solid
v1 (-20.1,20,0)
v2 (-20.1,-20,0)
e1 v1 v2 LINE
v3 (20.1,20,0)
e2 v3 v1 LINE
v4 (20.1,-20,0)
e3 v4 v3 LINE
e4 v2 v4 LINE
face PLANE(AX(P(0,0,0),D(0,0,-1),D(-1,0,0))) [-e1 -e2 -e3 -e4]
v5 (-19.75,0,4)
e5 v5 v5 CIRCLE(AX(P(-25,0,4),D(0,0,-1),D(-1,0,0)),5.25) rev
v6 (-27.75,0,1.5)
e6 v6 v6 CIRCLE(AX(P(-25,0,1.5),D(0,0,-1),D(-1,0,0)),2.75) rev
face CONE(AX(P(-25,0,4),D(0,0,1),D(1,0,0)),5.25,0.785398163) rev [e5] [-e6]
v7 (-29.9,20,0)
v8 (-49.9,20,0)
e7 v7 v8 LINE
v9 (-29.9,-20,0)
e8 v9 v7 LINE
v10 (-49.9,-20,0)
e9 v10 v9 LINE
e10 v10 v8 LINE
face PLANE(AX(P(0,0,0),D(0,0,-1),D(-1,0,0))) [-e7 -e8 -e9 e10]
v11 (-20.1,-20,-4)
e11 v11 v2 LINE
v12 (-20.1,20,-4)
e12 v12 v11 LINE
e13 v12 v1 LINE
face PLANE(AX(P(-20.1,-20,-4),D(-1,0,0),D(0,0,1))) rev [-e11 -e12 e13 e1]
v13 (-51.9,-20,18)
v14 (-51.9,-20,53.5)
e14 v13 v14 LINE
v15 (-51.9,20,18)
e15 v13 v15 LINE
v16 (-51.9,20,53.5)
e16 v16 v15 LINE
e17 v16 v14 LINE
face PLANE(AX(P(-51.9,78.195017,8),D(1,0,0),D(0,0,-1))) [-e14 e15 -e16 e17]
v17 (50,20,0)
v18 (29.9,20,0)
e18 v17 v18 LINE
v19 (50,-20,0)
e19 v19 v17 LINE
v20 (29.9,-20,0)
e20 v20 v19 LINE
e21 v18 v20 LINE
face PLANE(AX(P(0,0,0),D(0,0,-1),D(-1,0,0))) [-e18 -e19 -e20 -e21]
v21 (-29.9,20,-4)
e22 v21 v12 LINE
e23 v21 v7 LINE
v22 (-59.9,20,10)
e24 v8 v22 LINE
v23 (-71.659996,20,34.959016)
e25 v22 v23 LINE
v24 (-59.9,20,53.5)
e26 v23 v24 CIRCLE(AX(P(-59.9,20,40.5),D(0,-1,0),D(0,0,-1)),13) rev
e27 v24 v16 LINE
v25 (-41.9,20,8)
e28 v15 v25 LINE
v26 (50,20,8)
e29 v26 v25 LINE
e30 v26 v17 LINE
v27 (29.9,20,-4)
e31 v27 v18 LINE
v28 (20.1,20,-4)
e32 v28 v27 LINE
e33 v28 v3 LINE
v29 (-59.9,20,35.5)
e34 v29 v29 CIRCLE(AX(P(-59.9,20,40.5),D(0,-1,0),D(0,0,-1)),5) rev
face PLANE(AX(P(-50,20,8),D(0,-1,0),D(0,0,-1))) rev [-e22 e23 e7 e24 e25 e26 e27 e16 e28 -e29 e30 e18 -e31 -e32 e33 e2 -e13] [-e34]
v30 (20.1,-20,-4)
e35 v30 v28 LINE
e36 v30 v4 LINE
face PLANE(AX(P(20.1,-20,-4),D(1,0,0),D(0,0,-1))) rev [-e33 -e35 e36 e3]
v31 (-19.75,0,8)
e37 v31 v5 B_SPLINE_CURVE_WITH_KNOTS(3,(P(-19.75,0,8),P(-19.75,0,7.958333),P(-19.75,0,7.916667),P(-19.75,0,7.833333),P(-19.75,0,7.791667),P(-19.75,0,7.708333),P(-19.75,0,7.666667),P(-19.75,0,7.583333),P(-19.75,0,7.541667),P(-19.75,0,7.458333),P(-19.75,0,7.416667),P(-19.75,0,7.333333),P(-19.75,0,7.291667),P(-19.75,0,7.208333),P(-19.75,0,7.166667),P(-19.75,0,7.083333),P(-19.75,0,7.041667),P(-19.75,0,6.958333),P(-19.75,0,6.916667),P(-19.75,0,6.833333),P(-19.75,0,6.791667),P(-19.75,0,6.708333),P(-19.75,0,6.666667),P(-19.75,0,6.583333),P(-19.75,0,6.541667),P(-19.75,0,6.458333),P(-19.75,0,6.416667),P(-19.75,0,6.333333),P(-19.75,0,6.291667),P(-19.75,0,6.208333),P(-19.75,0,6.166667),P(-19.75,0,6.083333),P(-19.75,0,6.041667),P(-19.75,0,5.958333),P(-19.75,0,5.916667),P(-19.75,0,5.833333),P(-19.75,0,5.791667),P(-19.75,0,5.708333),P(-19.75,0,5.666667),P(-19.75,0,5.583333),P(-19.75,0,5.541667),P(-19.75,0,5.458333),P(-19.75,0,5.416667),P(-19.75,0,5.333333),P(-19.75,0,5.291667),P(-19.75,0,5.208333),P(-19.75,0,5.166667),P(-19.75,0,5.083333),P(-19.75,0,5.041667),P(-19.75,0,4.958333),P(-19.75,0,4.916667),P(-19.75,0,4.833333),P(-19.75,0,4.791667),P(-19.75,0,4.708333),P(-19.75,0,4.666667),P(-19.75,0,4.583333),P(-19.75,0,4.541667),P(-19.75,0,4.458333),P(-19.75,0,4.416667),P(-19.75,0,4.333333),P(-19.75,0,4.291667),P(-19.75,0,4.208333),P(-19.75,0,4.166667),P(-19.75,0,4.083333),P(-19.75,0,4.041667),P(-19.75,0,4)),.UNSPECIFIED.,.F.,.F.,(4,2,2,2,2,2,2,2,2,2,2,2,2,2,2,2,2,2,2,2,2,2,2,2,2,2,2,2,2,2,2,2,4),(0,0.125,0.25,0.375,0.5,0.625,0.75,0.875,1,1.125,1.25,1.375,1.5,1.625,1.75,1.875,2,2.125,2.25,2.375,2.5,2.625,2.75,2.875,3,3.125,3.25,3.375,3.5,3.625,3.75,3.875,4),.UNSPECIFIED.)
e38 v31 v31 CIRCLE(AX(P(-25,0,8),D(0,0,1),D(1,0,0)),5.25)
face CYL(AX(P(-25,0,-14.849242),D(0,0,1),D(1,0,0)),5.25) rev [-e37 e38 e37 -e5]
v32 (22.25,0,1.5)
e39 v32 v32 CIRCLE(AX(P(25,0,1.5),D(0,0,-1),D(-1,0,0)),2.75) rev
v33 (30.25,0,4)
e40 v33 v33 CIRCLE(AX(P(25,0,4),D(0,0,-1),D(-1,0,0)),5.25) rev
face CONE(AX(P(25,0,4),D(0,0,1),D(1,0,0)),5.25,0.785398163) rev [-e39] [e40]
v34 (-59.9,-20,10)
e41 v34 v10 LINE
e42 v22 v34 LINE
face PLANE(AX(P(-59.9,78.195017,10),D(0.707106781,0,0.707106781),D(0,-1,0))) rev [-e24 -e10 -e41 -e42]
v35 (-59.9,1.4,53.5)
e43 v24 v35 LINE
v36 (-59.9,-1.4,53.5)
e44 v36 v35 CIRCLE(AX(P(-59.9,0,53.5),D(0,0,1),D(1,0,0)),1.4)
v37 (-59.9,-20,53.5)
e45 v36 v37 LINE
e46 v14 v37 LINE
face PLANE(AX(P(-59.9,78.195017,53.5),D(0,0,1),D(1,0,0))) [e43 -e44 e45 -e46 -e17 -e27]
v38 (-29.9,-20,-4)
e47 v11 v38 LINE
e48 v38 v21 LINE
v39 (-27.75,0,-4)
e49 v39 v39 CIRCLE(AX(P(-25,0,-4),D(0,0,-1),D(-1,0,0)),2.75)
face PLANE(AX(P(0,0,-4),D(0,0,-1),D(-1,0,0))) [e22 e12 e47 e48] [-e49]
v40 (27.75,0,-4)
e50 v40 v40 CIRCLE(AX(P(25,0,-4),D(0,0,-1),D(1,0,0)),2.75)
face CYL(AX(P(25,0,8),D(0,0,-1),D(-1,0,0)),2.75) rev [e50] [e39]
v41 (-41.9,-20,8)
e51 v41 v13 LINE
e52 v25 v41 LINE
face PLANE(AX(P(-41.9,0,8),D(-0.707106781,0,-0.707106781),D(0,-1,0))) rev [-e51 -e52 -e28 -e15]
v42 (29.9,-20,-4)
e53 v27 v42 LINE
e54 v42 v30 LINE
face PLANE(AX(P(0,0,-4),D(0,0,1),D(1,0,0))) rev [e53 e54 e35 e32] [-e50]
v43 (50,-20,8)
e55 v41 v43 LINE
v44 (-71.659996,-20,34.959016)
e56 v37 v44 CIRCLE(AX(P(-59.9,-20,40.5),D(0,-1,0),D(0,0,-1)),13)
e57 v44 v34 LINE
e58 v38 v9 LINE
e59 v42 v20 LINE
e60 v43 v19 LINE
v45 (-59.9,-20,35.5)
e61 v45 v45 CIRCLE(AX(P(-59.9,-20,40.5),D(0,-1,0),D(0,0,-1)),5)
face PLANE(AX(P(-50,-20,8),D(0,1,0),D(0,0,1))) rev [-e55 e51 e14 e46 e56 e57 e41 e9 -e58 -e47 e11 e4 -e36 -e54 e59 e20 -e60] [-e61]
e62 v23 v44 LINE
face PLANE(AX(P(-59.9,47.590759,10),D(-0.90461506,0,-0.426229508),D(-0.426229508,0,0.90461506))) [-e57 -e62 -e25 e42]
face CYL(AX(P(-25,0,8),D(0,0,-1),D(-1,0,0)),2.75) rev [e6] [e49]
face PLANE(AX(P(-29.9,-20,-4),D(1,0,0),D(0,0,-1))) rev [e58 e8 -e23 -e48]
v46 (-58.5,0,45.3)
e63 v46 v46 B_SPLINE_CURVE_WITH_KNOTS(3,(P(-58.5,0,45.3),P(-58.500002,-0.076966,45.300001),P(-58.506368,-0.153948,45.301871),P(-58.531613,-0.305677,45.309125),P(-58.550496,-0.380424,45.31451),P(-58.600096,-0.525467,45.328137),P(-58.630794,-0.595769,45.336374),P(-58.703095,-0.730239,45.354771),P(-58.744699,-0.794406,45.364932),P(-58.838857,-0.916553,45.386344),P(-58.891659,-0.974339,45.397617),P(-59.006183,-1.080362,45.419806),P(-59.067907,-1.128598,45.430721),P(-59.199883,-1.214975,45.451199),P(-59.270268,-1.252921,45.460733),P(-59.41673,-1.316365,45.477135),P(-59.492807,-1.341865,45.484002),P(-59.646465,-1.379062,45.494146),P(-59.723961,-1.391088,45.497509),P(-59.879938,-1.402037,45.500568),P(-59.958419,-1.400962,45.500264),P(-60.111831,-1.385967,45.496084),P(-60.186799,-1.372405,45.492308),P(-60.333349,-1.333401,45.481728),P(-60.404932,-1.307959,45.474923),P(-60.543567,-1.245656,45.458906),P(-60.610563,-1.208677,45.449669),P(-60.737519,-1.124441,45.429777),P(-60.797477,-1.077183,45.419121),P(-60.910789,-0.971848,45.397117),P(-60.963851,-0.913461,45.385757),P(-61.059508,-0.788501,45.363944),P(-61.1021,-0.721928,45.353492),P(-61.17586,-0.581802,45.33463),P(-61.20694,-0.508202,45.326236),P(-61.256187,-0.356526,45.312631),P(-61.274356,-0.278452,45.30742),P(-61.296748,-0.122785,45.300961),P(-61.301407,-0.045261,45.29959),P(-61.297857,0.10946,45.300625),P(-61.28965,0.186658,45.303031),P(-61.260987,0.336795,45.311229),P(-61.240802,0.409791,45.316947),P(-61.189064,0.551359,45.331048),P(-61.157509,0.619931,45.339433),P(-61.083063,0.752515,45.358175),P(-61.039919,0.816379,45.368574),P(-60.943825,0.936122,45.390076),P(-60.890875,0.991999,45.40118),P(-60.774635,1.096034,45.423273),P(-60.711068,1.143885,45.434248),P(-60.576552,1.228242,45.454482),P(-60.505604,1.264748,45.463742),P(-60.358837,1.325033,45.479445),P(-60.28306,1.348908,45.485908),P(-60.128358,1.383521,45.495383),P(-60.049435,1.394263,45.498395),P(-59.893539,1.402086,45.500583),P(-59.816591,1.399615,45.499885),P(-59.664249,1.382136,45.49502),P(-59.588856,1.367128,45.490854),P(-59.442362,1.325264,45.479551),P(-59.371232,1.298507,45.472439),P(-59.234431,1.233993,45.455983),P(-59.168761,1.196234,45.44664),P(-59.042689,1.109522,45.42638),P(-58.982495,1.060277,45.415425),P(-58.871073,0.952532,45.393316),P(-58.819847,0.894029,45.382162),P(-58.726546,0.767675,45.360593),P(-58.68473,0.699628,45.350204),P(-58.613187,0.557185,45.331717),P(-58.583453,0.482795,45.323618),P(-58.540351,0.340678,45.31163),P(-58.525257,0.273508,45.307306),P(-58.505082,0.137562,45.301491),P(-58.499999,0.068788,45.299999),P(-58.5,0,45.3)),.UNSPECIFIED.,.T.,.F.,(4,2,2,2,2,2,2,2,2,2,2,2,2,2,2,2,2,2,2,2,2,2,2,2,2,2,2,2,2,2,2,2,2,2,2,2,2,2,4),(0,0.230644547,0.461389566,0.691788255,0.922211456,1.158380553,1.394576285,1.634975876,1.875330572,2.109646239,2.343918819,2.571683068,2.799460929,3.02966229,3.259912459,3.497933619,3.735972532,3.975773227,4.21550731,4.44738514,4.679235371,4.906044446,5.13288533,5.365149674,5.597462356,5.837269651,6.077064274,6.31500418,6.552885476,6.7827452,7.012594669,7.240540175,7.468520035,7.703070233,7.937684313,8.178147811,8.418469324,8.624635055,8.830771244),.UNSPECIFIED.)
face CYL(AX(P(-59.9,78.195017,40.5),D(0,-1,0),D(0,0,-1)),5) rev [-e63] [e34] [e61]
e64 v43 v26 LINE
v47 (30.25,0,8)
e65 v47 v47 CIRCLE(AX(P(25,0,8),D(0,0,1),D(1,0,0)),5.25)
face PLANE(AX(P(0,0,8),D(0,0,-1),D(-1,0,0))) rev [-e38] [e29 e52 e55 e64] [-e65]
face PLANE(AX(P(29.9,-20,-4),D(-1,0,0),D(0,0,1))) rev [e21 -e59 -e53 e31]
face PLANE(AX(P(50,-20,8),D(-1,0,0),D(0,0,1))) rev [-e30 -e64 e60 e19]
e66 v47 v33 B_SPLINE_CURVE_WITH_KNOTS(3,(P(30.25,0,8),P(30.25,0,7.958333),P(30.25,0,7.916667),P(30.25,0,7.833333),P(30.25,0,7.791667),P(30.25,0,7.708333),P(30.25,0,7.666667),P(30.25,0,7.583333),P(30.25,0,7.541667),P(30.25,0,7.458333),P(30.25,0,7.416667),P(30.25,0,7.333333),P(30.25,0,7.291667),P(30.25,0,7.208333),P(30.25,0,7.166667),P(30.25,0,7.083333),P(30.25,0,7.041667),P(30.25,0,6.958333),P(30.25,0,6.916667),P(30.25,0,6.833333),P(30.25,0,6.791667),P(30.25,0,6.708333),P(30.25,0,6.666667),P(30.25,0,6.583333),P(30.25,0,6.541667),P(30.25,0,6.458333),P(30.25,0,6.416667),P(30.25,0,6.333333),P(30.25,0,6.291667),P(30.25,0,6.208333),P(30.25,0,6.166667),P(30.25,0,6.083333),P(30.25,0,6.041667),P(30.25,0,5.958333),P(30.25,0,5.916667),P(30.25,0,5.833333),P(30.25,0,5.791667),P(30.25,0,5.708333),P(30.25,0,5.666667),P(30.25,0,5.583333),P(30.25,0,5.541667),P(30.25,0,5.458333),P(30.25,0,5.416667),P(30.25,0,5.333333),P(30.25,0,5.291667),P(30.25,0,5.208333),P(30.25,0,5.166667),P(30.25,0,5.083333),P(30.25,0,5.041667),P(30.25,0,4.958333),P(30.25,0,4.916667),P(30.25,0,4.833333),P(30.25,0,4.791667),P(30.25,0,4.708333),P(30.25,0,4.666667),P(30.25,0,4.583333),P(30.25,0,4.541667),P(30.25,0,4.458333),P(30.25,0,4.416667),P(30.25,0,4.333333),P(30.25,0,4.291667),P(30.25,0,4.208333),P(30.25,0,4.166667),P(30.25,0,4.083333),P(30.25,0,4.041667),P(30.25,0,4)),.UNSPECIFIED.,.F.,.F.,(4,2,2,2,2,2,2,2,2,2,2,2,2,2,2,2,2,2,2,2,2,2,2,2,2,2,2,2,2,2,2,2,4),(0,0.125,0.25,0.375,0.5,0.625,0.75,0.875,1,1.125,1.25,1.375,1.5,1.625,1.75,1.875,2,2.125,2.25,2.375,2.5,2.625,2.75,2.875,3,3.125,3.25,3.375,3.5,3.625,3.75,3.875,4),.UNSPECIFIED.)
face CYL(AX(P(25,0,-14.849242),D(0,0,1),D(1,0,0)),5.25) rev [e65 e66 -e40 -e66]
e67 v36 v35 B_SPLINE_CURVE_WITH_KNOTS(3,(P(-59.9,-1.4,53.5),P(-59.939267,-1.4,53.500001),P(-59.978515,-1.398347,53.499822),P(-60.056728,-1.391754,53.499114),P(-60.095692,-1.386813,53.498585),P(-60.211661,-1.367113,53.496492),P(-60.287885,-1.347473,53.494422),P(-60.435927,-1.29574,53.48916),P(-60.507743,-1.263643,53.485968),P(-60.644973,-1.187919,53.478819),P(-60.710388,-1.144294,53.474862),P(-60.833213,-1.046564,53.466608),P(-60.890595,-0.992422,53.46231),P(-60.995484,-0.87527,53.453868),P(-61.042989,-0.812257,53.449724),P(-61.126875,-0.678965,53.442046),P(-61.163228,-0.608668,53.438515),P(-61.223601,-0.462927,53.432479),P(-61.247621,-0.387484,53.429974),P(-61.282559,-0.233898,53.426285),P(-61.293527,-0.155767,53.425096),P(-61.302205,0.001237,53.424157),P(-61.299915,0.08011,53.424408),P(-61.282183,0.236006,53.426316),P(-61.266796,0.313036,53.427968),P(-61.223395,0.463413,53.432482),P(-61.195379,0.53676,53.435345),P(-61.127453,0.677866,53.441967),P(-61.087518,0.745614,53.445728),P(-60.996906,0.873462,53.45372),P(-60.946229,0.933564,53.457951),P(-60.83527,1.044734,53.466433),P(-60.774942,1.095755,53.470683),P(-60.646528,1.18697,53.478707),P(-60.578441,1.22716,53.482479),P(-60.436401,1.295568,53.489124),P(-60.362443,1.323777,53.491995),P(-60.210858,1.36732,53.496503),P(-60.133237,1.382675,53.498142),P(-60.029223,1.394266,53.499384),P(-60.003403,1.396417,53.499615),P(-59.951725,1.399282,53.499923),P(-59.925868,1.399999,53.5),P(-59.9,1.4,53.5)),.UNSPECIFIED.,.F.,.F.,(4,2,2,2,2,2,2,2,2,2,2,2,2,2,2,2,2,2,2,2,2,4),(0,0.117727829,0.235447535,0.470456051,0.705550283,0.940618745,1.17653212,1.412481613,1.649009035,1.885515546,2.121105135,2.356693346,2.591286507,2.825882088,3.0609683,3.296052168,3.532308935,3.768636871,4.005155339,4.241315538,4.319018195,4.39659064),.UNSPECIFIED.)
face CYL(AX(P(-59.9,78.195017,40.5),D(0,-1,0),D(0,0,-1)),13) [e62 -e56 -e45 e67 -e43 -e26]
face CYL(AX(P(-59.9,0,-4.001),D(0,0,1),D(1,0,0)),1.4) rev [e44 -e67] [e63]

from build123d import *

# Parameters (mm, degrees)
SKETCH1_W               = 100
SKETCH1_H               = 40
SKETCH1_R               = 2.75
BOSS_EXTRUDE1_DEPTH     = 8
SKETCH2_R               = 5
BOSS_EXTRUDE2_DEPTH     = 40
BOSS_EXTRUDE3_START     = 4
SKETCH4_W               = 9.8
SKETCH4_H               = 40
SKETCH4_R               = 2.75
BOSS_EXTRUDE3_DEPTH     = 4
SKETCH5_R               = 5.25
CUT_EXTRUDE1_DEPTH      = 4
CHAMFER2_SIZE           = 2.5
CUT_EXTRUDE2_REACH      = 96.977
CUT_EXTRUDE2_END_RADIUS = 5
SKETCH6_R               = 1.4
BOSS_EXTRUDE4_DEPTH     = 40


# Some blends are built 0.0001 mm under size
with BuildPart() as part:
    # Sketch1 → Boss-Extrude1 (new body)
    with BuildSketch(Plane.XY):
        Rectangle(SKETCH1_W, SKETCH1_H)
        with Locations((-25, 0)):
            Circle(SKETCH1_R, mode=Mode.SUBTRACT)
        with Locations((25, 0)):
            Circle(SKETCH1_R, mode=Mode.SUBTRACT)
    extrude(amount=BOSS_EXTRUDE1_DEPTH)

    # Sketch2 → Boss-Extrude2 (add)
    with BuildSketch(Plane.XZ.offset(20)):
        with BuildLine():
            Line((-50, 0), (-59.9, 0))
            Line((-59.9, 0), (-59.9, 27.5))
            ThreePointArc((-59.9, 27.5), (-72.9, 40.5), (-59.9, 53.5))
            Line((-59.9, 53.5), (-51.9, 53.5))
            Line((-51.9, 53.5), (-51.9, 8))
            Line((-51.9, 8), (-50, 8))
            Line((-50, 8), (-50, 0))
        make_face()
        with Locations(Location((-59.9, 40.5, 0), (0, 0, 270))):
            Circle(SKETCH2_R, mode=Mode.SUBTRACT)
    extrude(amount=-BOSS_EXTRUDE2_DEPTH)

    # Chamfer1
    # the kernel refuses this chamfer: 10 mm, written as the material it adds along each edge
    with BuildSketch(Plane(origin=(-51.9, -20, 8), x_dir=(0.9996219169112968, 0, -0.027495876610586403), z_dir=(0, 1, 0))) as chamfer1_piece_1:
        with BuildLine():
            Line((10.286731952, 0), (-0.565471549, -10.271177935))
            Line((-0.565471549, -10.271177935), (-0.765395932, -10.26567876))
            ThreePointArc((-0.765395932, -10.26567876), (-0.341292271, -5.133978296), (-0.199924383, 0.005499175))
            Line((-0.199924383, 0.005499175), (0.005499175, 0.199924383))
            ThreePointArc((0.005499175, 0.199924383), (5.144976647, 0.058556496), (10.292231127, 0.199924383))
            Line((10.292231127, 0.199924383), (10.286731952, 0))
        make_face()
    extrude(amount=40)
    with BuildSketch(Plane(origin=(-59.9, -20, 27.5), x_dir=(-0.9634026382887829, 0, 0.26805849462050707), z_dir=(0, 1, 0))) as chamfer1_piece_2:
        with BuildLine():
            Line((6.087608123, 0), (-2.363030305, -7.699460597))
            Line((-2.363030305, -7.699460597), (-2.555710833, -7.645848898))
            ThreePointArc((-2.555710833, -7.645848898), (-1.271764875, -3.82461909), (-0.192680528, 0.053611699))
            Line((-0.192680528, 0.053611699), (0.053611699, 0.192680528))
            ThreePointArc((0.053611699, 0.192680528), (3.034373901, -0.267839497), (6.052113215, 0.196825079))
            Line((6.052113215, 0.196825079), (6.087608123, 0))
        make_face()
    extrude(amount=40)
    # the kernel refuses this chamfer: 10 mm, written as the material it takes off along each edge
    with BuildSketch(Plane(origin=(-59.9, -45.71682988, 0), x_dir=(-0.027495876610586324, 0, 0.9996219169112968), z_dir=(0, 1, 0))) as chamfer1_2_piece_1:
        with BuildLine():
            Line((10.286731952, 0), (-0.565471549, 10.271177935))
            Line((-0.565471549, 10.271177935), (-0.765395932, 10.26567876))
            ThreePointArc((-0.765395932, 10.26567876), (-0.341292271, 5.133978296), (-0.199924383, -0.005499175))
            Line((-0.199924383, -0.005499175), (0.005499175, -0.199924383))
            ThreePointArc((0.005499175, -0.199924383), (5.144976647, -0.058556496), (10.292231127, -0.199924383))
            Line((10.292231127, -0.199924383), (10.286731952, 0))
        make_face()
    extrude(amount=91.433659759, mode=Mode.SUBTRACT)

    # Sketch4 → Boss-Extrude3 (add)
    # profile 1 of 2: a face of its own
    with BuildSketch(Plane(origin=(0, 0, 0), x_dir=(-1, 0, 0), z_dir=(0, 0, -1)).offset(BOSS_EXTRUDE3_START)):
        with Locations((25, 0)):
            Rectangle(SKETCH4_W, SKETCH4_H)
        with Locations((25, 0)):
            Circle(SKETCH4_R, mode=Mode.SUBTRACT)
    # profile 2 of 2: a face of its own
    with BuildSketch(Plane(origin=(0, 0, 0), x_dir=(-1, 0, 0), z_dir=(0, 0, -1)).offset(BOSS_EXTRUDE3_START)):
        with Locations((-25, 0)):
            Rectangle(SKETCH4_W, SKETCH4_H)
        with Locations(Location((-25, 0, 0), (0, 0, 180))):
            Circle(SKETCH4_R, mode=Mode.SUBTRACT)
    extrude(amount=-BOSS_EXTRUDE3_DEPTH)

    # Sketch5 → Cut-Extrude1 (cut)
    with BuildSketch(Plane.XY.offset(8)):
        with Locations((25, 0)):
            Circle(SKETCH5_R)
        with Locations((-25, 0)):
            Circle(SKETCH5_R)
    extrude(amount=-CUT_EXTRUDE1_DEPTH, mode=Mode.SUBTRACT)

    # Chamfer2
    chamfer2_edges = [part.edges().sort_by_distance(p)[0] for p in [
        (22.25, 0, 4),
        (-27.75, 0, 4),
    ]]
    chamfer(chamfer2_edges, length=CHAMFER2_SIZE - 0.0001)  # a hair under: the kernel refuses the full size

    # Cut-Extrude2: up to this cylinder (the profile starts outside it)
    cut_extrude2_end = Plane(origin=(-59.9, 0, 40.5), z_dir=(0, -1, 0)) * Cylinder(CUT_EXTRUDE2_END_RADIUS, 204.954, mode=Mode.PRIVATE)
    # Sketch6 → Cut-Extrude2 (cut, up to the surface)
    with BuildSketch(Plane.XY.offset(53.5), mode=Mode.PRIVATE) as cut_extrude2_sk1:
        with Locations((-59.9, 0)):
            Circle(SKETCH6_R)
    cut_extrude2_tool1 = extrude(cut_extrude2_sk1.sketch, amount=-CUT_EXTRUDE2_REACH, mode=Mode.PRIVATE) - cut_extrude2_end
    add(cut_extrude2_tool1.solids().sort_by_distance((-59.9, 0, 53.5))[0], mode=Mode.SUBTRACT)

    # Sketch7 → Boss-Extrude4 (add)
    with BuildSketch(Plane.XZ.offset(20)):
        Polygon((-59.9, 10), (-71.659995777, 34.959016393), (-59.9, 34.959016393), align=None)
    extrude(amount=-BOSS_EXTRUDE4_DEPTH)


solid = part.part
